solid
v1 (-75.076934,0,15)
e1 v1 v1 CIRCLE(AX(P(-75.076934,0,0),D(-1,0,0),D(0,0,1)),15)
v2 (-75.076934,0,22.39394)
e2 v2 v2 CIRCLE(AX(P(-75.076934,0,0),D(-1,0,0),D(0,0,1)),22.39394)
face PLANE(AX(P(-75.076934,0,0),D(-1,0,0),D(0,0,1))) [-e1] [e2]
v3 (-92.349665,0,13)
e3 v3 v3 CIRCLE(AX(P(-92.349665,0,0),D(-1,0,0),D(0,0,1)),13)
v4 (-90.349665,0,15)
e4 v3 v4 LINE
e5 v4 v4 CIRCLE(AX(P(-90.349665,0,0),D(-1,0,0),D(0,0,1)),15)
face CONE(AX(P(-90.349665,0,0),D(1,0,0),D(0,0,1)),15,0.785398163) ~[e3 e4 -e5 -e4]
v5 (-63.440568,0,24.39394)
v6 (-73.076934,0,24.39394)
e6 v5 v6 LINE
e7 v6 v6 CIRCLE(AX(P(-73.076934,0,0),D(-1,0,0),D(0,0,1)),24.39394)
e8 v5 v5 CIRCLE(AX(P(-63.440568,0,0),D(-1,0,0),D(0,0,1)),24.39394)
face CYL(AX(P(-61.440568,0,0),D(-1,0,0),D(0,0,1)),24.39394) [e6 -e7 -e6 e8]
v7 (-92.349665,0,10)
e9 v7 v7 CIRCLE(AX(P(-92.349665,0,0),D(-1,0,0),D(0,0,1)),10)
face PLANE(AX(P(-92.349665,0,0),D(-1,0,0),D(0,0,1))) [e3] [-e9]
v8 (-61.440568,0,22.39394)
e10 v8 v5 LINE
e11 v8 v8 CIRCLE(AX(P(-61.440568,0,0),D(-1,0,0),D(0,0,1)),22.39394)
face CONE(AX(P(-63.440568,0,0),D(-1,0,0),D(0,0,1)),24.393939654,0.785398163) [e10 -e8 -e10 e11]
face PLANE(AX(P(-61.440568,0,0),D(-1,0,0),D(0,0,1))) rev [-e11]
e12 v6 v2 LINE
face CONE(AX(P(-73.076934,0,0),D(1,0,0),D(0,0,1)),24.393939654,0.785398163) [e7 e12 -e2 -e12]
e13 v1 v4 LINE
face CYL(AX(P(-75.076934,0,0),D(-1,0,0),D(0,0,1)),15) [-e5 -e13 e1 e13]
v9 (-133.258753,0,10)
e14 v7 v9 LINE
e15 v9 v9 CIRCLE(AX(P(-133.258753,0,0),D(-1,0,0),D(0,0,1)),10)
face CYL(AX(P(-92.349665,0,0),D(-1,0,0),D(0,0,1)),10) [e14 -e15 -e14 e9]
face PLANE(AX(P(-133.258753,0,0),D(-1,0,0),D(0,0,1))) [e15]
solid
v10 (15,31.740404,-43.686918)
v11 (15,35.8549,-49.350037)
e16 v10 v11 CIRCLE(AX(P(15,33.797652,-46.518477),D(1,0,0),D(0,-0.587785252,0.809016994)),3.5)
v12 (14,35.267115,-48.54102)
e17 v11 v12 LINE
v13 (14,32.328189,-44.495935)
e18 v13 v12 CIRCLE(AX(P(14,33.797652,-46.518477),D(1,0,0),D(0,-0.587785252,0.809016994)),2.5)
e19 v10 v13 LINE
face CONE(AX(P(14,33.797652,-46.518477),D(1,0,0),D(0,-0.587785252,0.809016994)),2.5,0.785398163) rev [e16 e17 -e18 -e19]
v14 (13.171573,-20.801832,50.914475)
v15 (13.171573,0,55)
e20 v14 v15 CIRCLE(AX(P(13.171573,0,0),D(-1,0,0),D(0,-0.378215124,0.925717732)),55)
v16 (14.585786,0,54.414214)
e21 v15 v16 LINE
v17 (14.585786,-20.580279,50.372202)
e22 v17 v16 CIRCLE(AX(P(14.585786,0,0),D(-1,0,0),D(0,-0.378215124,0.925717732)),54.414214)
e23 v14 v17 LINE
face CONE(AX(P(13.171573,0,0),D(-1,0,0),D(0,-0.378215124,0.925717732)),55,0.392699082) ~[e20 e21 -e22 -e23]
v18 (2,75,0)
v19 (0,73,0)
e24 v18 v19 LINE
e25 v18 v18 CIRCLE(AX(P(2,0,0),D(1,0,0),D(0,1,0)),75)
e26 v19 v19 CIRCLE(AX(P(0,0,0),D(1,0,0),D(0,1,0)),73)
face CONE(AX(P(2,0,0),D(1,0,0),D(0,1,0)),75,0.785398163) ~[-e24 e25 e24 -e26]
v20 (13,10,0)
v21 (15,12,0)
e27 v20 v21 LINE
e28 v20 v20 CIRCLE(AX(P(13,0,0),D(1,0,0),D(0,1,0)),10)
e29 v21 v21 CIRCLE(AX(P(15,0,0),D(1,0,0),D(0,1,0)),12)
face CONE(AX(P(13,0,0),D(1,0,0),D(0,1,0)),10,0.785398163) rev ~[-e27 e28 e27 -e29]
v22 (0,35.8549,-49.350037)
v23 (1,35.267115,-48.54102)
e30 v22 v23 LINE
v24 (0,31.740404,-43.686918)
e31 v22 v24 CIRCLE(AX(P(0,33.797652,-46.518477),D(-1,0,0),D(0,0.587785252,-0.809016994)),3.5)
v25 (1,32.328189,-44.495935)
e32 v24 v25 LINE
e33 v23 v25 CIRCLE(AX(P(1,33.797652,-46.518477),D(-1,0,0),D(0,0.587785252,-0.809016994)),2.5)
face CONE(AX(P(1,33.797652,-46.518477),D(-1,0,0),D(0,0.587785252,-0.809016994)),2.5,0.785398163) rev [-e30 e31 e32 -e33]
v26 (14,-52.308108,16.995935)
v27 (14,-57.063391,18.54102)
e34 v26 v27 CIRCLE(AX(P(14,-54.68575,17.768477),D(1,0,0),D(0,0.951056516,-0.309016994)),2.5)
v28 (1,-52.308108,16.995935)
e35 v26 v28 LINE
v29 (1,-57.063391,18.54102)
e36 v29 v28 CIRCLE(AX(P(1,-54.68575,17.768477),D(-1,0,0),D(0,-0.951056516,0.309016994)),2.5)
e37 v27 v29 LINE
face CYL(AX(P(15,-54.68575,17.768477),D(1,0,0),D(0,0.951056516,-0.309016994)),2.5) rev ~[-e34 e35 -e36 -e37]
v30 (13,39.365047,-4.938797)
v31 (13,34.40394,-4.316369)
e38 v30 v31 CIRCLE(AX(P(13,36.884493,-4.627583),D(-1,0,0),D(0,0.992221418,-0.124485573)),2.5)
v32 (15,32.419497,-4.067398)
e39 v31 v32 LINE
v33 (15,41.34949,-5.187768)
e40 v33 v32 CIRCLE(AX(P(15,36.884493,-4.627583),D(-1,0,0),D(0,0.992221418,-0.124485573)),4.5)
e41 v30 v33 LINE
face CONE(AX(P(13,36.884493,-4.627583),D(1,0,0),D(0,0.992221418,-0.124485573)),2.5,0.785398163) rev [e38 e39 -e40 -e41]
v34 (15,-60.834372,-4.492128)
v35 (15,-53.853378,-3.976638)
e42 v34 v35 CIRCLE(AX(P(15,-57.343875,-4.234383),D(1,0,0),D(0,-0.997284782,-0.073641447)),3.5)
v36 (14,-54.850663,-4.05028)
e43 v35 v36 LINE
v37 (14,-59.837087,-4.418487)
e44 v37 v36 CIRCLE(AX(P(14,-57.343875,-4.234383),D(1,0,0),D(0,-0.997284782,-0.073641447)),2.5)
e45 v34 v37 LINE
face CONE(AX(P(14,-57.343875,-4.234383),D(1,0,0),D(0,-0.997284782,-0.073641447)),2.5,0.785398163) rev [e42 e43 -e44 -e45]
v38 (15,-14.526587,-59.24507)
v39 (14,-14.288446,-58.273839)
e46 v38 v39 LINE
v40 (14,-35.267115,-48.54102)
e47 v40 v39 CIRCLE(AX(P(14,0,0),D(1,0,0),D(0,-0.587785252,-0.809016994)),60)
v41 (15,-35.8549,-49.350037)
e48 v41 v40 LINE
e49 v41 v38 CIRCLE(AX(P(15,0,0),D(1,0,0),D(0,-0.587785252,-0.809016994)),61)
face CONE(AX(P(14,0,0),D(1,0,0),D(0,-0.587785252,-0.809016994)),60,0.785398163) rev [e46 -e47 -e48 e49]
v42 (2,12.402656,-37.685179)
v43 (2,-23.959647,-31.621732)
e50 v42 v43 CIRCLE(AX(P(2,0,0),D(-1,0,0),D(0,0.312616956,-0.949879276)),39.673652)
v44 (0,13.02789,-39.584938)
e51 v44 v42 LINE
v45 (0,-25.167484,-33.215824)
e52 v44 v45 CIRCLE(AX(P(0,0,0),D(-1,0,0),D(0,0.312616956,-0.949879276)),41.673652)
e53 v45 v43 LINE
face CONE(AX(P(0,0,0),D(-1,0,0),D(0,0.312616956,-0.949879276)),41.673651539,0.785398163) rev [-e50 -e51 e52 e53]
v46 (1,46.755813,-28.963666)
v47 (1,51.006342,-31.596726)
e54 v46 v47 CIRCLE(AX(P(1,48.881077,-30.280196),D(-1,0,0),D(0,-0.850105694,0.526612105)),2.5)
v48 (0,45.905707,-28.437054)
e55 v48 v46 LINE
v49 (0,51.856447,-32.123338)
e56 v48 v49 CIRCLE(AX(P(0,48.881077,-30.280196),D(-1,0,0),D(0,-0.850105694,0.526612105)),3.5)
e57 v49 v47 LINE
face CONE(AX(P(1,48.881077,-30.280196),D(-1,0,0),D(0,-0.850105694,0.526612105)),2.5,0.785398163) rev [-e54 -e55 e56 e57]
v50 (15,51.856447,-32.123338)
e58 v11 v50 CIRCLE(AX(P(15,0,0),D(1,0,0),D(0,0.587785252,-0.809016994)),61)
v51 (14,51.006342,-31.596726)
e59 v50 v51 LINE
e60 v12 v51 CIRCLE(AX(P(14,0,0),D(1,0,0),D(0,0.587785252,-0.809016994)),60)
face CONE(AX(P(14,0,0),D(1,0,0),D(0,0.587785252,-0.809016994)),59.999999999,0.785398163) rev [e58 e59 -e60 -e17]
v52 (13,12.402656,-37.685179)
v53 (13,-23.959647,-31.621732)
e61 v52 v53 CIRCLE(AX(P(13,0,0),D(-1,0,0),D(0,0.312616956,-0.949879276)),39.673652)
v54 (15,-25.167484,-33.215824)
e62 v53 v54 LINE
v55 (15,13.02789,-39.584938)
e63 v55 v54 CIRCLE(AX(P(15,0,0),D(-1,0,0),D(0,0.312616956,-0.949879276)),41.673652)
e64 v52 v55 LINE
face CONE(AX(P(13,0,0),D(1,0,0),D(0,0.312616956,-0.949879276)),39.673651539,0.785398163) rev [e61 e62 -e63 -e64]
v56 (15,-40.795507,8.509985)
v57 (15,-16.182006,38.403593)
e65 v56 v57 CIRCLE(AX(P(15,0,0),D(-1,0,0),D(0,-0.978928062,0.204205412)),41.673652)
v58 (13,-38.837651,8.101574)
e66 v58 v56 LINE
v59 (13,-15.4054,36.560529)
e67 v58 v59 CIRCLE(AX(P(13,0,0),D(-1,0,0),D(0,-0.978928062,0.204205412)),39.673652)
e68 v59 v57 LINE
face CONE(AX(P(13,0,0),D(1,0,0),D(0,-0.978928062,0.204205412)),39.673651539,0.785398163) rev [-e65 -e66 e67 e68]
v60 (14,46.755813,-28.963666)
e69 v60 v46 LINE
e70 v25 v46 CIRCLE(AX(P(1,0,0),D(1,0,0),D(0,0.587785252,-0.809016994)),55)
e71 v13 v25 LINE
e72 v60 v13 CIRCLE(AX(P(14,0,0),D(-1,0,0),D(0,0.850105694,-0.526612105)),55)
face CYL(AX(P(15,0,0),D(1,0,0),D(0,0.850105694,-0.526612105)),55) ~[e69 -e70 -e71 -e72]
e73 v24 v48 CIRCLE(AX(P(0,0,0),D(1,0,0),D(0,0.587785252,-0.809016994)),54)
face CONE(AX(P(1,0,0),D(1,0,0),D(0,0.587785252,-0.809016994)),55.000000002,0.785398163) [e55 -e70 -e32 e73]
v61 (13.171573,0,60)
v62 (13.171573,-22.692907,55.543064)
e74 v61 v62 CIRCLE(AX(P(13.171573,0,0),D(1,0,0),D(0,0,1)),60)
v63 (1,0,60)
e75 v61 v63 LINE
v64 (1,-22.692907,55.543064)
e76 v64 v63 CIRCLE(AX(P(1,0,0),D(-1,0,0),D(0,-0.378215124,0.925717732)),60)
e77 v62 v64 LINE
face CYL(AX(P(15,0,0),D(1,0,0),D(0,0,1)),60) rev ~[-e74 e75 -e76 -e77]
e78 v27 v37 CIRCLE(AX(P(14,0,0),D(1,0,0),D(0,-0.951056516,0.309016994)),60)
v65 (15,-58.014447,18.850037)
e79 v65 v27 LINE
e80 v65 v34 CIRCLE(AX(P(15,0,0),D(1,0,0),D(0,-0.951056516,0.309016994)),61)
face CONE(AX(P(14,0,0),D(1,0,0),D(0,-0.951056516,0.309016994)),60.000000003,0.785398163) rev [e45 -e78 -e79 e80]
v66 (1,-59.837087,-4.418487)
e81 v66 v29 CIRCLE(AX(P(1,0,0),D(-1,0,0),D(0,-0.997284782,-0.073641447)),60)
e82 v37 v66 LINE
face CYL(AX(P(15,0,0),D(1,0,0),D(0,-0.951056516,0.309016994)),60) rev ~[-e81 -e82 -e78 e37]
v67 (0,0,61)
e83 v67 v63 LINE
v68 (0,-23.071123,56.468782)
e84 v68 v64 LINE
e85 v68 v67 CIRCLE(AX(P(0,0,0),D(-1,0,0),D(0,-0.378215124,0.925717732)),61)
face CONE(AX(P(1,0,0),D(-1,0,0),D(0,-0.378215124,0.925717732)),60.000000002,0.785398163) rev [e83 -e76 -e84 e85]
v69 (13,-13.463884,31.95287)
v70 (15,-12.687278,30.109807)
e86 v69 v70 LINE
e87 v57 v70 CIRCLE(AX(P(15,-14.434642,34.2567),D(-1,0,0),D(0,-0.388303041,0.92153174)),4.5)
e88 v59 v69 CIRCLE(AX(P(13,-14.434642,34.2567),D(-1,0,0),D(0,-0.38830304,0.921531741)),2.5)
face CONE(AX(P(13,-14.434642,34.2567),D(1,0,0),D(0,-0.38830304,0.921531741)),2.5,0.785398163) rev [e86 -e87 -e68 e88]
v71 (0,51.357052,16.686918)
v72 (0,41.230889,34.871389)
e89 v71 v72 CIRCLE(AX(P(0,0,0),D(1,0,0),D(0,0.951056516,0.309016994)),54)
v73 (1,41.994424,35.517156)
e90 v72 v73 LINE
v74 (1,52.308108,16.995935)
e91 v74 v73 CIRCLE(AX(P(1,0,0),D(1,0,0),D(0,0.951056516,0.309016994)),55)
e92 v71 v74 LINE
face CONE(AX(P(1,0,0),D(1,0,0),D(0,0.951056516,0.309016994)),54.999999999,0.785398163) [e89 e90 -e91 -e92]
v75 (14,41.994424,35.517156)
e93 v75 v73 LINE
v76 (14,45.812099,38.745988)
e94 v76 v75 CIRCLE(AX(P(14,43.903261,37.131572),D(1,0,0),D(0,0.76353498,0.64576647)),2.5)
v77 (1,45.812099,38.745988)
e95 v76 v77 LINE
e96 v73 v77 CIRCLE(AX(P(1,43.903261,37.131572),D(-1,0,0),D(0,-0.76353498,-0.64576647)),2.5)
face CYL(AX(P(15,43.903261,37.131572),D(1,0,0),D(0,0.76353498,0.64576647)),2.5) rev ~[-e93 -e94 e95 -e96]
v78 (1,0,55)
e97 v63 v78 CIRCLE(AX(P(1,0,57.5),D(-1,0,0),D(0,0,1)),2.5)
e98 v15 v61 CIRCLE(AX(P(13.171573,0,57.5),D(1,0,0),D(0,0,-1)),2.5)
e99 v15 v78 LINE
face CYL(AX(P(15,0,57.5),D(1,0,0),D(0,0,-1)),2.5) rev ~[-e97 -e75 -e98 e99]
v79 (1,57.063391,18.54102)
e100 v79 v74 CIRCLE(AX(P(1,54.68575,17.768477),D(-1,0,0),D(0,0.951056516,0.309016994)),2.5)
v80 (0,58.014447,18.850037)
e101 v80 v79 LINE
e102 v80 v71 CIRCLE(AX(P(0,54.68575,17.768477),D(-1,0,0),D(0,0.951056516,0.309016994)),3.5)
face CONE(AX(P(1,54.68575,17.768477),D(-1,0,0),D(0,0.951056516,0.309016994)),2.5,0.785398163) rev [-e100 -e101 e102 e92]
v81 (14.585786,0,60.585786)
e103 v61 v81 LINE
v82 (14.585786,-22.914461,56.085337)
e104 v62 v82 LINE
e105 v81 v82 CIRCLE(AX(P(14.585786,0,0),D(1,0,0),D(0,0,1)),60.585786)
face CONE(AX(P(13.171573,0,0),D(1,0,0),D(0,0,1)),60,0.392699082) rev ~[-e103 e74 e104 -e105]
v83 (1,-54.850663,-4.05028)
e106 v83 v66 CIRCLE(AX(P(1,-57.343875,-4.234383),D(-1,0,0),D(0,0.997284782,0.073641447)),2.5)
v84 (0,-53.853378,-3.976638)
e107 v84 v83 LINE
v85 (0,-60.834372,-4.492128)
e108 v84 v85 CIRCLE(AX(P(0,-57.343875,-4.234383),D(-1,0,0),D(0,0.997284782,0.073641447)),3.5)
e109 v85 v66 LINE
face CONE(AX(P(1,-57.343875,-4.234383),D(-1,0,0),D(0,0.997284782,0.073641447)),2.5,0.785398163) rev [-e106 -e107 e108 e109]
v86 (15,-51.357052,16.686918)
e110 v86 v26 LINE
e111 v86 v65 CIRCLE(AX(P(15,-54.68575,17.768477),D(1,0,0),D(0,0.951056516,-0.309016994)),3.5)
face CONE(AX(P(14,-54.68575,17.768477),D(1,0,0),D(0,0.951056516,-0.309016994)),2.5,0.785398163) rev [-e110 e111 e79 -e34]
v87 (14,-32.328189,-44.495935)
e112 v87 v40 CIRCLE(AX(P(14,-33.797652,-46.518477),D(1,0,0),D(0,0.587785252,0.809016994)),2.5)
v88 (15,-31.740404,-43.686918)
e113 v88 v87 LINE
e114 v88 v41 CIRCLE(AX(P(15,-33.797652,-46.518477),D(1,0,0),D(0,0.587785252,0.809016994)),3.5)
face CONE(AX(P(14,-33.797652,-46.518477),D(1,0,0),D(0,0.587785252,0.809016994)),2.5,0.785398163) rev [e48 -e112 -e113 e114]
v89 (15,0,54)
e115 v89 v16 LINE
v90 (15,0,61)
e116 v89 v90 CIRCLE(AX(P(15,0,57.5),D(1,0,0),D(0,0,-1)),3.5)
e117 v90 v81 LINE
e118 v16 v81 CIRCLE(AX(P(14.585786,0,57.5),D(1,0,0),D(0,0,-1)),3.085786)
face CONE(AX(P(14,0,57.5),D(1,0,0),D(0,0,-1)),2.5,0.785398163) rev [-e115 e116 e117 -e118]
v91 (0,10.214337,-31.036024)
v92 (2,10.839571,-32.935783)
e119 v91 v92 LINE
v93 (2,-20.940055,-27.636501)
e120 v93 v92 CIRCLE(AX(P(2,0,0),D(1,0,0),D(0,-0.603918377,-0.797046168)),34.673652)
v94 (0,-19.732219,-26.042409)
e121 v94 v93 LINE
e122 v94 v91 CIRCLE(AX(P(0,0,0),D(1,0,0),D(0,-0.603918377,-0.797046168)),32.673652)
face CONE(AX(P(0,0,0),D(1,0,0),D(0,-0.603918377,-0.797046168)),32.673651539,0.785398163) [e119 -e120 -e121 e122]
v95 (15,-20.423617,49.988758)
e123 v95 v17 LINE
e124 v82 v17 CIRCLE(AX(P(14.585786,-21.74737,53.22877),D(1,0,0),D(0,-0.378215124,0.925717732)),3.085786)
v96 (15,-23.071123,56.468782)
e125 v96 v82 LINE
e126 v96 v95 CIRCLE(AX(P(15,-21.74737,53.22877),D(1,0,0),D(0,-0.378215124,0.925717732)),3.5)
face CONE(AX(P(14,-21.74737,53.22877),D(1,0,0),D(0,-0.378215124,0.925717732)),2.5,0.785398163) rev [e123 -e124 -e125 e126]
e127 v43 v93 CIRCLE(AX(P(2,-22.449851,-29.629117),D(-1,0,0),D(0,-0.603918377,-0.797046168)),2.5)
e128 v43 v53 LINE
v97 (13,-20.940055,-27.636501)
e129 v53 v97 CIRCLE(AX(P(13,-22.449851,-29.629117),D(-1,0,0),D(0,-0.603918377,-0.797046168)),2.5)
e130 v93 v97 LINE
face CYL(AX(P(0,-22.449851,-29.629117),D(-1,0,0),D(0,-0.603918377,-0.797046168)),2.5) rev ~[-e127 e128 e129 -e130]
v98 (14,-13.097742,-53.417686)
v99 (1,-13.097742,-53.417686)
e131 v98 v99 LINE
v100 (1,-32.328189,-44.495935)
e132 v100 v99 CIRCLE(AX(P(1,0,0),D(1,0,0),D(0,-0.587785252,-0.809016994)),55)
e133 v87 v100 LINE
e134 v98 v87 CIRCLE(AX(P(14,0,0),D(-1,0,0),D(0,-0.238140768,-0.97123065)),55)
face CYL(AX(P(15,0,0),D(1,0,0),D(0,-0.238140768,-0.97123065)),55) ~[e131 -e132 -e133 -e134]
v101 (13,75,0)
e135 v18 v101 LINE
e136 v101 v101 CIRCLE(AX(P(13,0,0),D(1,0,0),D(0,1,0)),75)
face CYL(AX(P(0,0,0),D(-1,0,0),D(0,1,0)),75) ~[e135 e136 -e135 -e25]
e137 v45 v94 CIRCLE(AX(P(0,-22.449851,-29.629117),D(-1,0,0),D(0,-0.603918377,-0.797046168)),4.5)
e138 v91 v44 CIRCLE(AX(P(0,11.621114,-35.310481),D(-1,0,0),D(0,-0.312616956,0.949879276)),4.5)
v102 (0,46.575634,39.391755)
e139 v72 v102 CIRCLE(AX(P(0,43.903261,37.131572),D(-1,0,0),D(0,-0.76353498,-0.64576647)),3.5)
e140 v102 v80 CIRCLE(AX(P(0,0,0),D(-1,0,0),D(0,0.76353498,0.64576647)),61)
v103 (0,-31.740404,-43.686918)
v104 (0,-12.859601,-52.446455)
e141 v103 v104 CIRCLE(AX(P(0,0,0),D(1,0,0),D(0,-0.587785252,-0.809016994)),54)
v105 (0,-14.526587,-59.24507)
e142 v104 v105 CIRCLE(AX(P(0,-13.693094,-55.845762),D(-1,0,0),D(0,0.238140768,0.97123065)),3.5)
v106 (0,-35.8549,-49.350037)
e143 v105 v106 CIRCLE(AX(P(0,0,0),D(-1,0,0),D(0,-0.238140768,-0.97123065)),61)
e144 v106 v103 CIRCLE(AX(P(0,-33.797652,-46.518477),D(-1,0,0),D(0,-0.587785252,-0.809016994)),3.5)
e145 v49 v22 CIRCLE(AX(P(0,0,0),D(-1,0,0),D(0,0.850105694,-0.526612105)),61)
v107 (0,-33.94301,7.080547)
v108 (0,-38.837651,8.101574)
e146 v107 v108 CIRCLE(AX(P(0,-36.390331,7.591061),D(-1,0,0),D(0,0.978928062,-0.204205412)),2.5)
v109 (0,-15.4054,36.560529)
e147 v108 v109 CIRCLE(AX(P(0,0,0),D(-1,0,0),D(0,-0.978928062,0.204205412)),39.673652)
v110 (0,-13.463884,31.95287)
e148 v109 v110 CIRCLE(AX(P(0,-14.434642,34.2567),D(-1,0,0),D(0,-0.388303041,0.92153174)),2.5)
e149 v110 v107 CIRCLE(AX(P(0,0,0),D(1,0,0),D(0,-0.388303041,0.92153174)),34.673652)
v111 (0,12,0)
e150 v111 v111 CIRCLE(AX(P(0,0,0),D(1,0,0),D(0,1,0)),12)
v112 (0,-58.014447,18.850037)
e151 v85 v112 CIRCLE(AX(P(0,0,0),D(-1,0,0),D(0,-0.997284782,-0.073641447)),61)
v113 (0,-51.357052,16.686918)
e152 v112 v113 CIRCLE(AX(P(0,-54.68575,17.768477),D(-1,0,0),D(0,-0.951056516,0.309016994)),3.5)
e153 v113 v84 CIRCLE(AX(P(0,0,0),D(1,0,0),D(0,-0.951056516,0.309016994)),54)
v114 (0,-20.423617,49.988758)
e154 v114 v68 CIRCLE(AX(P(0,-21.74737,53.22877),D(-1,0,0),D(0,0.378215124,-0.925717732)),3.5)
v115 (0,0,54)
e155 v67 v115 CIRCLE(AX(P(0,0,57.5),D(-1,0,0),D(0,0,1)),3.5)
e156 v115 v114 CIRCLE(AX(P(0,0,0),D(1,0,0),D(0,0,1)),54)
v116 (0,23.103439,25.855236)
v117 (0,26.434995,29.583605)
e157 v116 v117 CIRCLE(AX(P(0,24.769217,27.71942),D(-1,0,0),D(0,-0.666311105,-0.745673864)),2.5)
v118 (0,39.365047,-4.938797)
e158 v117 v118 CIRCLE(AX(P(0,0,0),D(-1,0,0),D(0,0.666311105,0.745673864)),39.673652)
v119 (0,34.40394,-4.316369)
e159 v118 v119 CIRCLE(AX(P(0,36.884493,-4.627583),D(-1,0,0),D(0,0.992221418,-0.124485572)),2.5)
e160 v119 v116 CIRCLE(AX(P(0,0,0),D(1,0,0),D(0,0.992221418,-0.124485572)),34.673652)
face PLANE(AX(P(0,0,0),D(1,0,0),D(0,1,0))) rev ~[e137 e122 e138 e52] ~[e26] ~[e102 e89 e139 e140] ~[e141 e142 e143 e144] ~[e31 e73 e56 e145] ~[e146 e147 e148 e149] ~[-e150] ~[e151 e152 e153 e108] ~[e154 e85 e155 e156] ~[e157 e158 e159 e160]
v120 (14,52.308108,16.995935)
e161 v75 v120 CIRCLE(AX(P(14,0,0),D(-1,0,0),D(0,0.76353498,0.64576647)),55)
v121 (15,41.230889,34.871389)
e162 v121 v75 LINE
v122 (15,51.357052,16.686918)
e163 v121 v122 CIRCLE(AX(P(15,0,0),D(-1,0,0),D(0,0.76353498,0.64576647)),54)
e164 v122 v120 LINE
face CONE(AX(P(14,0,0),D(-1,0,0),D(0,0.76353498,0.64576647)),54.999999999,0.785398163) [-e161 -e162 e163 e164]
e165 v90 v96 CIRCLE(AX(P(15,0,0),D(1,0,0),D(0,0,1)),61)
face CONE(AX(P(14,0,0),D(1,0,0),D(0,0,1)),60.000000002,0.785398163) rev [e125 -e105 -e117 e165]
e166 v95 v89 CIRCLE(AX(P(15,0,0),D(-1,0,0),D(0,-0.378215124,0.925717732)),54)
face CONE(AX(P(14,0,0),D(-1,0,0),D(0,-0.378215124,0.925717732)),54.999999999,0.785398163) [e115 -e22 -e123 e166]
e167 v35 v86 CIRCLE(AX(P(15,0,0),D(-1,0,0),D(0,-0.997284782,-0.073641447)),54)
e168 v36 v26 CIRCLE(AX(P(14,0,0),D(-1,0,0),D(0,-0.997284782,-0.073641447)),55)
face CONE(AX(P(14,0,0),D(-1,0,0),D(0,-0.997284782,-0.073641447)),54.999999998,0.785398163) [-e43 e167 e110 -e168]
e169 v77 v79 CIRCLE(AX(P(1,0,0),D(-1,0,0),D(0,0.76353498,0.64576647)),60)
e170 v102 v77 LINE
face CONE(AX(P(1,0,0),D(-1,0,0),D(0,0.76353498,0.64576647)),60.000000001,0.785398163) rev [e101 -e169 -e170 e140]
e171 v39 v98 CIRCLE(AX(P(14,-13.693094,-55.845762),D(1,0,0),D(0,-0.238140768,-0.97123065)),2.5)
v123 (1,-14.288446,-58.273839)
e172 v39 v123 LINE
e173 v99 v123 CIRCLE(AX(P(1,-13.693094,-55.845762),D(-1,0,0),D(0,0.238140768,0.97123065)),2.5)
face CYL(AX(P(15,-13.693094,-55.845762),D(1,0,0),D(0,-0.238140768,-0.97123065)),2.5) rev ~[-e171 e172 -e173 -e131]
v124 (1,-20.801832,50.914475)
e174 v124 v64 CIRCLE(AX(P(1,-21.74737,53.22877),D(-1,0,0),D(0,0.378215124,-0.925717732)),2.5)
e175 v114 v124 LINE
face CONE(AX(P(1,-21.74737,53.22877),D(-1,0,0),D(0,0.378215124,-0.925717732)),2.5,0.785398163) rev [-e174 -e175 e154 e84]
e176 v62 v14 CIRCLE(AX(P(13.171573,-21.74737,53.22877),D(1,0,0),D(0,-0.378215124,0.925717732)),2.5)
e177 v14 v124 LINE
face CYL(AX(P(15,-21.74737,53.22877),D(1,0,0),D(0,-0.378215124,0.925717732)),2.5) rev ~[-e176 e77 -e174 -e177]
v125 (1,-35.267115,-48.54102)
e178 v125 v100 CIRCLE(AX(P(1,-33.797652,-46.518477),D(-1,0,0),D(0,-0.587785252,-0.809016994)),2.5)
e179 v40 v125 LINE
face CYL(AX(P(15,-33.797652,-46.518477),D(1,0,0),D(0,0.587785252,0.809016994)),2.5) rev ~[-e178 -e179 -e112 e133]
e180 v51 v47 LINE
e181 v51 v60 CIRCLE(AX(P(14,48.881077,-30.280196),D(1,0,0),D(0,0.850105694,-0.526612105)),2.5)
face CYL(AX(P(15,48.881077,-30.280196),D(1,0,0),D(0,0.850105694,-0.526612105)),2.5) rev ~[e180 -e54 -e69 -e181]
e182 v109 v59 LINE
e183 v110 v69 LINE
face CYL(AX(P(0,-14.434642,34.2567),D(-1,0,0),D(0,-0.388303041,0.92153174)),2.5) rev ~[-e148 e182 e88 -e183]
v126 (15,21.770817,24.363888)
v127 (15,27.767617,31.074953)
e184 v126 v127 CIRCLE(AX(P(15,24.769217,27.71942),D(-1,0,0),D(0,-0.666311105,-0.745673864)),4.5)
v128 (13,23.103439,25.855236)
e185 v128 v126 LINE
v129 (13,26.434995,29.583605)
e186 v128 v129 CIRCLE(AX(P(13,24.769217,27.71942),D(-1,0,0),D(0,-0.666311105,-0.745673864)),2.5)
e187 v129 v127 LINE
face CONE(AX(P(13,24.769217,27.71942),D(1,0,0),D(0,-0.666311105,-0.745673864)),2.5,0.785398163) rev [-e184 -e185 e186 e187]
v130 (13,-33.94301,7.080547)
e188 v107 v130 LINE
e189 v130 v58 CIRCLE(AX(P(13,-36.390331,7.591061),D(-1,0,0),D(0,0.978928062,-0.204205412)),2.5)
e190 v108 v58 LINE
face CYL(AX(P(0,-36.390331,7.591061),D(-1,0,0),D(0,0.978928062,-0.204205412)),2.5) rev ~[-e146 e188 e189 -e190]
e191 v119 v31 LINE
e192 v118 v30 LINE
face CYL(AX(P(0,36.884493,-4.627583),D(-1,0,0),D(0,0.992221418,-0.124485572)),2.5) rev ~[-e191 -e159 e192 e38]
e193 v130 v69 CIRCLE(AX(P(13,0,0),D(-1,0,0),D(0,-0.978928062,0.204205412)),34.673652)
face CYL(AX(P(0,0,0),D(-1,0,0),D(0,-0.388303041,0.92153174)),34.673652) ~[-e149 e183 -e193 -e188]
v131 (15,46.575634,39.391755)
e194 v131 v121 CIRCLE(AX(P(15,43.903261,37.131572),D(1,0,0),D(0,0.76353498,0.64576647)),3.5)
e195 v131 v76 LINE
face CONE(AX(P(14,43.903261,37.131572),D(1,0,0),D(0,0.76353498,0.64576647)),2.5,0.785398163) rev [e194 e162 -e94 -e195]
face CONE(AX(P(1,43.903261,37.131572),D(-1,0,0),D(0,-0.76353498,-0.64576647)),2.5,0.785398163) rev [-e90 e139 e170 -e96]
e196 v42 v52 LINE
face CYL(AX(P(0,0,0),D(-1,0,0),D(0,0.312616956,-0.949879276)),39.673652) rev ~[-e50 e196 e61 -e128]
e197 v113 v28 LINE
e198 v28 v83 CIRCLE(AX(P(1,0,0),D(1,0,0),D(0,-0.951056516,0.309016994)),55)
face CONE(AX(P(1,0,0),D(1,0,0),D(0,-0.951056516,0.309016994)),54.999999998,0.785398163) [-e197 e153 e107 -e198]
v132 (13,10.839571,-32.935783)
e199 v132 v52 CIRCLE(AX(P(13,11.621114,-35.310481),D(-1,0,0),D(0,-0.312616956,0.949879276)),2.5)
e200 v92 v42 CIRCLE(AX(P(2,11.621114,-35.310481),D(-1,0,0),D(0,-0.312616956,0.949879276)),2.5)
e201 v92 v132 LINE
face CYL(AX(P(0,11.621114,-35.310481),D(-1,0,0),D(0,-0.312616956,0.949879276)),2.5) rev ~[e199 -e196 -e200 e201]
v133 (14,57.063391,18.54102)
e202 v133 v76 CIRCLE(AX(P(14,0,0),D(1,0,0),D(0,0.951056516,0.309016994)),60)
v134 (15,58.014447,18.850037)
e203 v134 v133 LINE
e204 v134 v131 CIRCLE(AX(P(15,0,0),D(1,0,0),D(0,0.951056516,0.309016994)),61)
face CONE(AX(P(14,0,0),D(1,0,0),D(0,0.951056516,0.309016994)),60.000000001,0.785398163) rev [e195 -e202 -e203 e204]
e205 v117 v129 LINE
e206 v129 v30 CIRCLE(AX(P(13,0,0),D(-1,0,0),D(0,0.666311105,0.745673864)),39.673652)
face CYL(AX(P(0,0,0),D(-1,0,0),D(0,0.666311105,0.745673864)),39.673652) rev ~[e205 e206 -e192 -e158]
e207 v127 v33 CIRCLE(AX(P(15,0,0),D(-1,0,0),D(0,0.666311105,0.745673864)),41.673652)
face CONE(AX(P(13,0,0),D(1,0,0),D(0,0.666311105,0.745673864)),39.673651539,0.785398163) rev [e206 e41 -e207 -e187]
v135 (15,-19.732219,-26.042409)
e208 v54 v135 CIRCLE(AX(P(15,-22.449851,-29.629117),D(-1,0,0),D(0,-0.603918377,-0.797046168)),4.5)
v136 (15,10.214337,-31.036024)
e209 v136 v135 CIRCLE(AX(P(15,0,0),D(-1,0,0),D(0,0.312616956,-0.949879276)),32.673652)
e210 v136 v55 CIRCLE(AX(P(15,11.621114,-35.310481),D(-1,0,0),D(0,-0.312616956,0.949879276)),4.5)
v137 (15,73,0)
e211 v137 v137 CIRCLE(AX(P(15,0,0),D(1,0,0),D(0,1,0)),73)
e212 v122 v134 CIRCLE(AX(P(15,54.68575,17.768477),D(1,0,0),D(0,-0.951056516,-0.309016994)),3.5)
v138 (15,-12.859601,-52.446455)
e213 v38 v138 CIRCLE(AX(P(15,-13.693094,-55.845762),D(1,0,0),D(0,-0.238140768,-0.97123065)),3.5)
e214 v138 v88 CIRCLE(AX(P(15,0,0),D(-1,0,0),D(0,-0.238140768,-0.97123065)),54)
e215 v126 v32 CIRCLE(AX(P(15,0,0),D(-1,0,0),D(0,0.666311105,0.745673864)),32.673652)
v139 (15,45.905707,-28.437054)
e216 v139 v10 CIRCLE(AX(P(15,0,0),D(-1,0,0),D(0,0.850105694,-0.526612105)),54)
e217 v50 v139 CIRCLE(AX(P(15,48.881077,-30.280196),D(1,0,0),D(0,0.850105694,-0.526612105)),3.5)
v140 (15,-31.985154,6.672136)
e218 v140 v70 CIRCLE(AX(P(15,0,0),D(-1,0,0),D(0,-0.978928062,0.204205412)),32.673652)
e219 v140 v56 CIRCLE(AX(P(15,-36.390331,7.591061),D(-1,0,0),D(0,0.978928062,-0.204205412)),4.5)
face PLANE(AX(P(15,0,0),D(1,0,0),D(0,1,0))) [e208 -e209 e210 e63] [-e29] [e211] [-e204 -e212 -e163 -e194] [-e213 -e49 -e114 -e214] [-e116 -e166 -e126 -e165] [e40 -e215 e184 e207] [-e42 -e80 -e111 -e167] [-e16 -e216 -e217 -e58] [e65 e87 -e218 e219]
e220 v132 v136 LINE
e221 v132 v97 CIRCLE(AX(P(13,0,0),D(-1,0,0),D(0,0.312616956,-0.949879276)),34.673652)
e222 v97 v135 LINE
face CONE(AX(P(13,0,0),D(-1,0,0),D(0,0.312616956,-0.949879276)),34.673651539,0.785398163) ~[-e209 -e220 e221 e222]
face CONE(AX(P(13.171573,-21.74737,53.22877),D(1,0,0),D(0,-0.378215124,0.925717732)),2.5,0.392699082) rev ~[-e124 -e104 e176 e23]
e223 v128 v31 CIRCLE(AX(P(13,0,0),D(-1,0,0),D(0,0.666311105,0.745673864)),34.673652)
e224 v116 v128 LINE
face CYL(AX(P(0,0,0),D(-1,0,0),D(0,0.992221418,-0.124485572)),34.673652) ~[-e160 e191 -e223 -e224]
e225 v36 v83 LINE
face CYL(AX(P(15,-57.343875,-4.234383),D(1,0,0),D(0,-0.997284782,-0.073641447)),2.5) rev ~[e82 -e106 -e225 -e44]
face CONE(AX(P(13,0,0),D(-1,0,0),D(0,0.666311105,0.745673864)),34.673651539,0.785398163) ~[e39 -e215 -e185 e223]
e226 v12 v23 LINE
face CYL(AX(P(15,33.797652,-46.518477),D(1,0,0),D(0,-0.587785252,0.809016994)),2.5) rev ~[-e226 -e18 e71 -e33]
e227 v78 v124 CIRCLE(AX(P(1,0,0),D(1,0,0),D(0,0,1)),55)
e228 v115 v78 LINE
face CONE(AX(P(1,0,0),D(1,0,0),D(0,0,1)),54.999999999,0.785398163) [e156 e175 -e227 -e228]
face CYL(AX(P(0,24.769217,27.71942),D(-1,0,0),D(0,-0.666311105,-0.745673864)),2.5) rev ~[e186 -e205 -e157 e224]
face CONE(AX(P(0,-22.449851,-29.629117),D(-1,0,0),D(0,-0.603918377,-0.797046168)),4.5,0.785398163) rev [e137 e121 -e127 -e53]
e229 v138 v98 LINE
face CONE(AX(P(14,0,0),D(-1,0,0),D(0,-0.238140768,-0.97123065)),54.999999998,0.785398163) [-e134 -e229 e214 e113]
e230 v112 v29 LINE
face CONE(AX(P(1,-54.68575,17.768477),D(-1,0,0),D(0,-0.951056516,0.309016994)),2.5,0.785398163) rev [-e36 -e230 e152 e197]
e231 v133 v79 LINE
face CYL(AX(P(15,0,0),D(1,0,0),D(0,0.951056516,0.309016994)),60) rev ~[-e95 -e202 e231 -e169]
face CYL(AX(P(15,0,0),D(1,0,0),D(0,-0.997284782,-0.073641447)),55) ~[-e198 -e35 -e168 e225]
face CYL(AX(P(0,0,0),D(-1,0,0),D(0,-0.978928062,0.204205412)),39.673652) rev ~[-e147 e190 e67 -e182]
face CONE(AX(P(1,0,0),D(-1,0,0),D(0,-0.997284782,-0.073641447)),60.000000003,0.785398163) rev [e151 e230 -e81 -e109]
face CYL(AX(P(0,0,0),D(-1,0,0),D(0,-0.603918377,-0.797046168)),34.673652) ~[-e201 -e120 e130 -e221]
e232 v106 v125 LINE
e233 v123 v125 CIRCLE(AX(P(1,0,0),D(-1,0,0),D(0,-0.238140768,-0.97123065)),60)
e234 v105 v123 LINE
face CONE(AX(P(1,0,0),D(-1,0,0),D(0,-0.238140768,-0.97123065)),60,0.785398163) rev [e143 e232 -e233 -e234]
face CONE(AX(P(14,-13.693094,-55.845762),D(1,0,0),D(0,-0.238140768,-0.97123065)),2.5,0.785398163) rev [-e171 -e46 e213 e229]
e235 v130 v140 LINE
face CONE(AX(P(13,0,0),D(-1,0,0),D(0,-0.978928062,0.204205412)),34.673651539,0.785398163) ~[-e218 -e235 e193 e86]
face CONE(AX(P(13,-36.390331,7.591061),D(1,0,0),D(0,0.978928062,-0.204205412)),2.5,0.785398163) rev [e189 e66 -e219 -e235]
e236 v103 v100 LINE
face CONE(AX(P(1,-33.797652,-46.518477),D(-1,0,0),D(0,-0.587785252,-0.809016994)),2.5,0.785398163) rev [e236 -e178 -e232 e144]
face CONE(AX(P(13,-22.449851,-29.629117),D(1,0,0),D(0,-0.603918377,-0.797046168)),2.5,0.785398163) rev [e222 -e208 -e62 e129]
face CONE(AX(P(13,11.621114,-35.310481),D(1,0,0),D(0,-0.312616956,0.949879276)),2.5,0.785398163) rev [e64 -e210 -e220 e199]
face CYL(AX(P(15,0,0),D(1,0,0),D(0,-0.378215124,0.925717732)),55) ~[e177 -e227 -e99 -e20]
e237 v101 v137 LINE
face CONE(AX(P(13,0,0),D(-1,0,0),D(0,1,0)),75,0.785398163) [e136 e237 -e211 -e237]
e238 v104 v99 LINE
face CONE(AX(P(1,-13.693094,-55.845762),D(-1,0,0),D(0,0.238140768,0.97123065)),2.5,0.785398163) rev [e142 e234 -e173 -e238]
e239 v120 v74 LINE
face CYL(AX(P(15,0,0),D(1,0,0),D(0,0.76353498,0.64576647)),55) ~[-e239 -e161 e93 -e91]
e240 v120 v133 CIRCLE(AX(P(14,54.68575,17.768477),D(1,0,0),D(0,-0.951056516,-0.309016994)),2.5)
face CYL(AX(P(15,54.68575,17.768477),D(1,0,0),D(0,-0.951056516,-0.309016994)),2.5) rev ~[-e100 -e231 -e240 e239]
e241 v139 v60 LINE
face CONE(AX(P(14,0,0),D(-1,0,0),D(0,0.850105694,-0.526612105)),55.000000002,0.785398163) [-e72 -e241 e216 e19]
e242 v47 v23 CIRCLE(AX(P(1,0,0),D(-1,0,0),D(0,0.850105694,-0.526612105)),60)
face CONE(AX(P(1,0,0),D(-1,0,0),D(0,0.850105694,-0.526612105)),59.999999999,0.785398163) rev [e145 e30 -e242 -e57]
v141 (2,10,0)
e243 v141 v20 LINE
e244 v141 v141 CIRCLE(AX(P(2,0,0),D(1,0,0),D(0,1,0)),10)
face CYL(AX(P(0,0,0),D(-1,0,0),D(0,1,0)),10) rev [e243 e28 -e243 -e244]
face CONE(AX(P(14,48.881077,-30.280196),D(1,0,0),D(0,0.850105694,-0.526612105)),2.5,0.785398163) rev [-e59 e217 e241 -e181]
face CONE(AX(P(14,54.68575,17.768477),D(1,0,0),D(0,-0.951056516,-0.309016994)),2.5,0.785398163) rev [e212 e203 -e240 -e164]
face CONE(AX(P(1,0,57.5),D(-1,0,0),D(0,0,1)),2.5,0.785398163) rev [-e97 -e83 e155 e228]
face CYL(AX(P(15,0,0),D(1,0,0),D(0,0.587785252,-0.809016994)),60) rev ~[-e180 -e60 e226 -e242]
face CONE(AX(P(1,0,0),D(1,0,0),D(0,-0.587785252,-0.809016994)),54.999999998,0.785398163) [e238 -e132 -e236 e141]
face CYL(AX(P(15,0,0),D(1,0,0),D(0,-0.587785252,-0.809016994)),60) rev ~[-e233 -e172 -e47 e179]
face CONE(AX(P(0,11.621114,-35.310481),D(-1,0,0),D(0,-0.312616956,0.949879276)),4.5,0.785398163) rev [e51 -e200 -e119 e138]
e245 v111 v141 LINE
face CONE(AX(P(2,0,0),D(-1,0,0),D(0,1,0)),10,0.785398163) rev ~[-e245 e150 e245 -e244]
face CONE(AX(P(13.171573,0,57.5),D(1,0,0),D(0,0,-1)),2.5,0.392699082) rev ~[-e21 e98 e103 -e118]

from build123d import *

# Parameters (mm, degrees)
F0_R         = 75
F0_R_2       = 10
F1_DEPTH     = 15
F2_SIZE      = 2
F4_DEPTH     = 15.001
F5_SIZE      = 1
F6_SIZE      = 2
F8_DEPTH     = 15.001
F9_T2_ANGLE  = 55.3680606349
F9_T4_ANGLE  = 22.2231670965
F9_T6_ANGLE  = 55.3680606349
F9_T8_ANGLE  = 55.3680606349
F9_T10_ANGLE = 55.3680606349
F9_T12_ANGLE = 180
F9_T14_ANGLE = 180
F9_T16_ANGLE = 55.3680606349
F9_T18_ANGLE = 180
F9_T20_ANGLE = 180
F9_T22_ANGLE = 55.3680606349
F9_T24_ANGLE = 180
F9_T26_ANGLE = 180
F9_T28_ANGLE = 55.3680606349
F9_T30_ANGLE = 180
F9_T32_ANGLE = 180
F9_T34_ANGLE = 22.2231670965
F9_T36_ANGLE = 180
F9_T38_ANGLE = 180
F9_T40_ANGLE = 55.3680606349
F12_SIZE     = 2


# Not quite as in the source:
# - a fillet or chamfer that OpenCascade refuses, or shapes differently, is made with other operations: its cross-section is extruded or revolved along the edge and cut away or added
# - a feature names something its author has since deleted; it is built from what else it names


with BuildPart() as f1:
    # F0 (on Right) → F1 (new body)
    with BuildSketch(Plane.YZ):
        Circle(F0_R)
        Circle(F0_R_2, mode=Mode.SUBTRACT)
    extrude(amount=F1_DEPTH)

    # F2
    f2_edges = [f1.edges().sort_by_distance(p)[0] for p in [
        (15, -75, 0),
        (0, -75, 0),
        (15, -10, 0),
    ]]
    chamfer(f2_edges, length=F2_SIZE)

    # F3 (on face) → F4 (cut, through all)
    with BuildSketch(Plane.YZ.offset(15)):
        with BuildLine():
            ThreePointArc((0, 55), (2.5, 57.5), (0, 60))
            ThreePointArc((0, 60), (-11.5632210939, 58.8752232941), (-22.6929074633, 55.5430639312))
            ThreePointArc((-22.6929074633, 55.5430639312), (-24.0616639828, 52.2832317897), (-20.8018318414, 50.9144752702))
            ThreePointArc((-20.8018318414, 50.9144752702), (-10.599619336, 53.9689546863), (0, 55))
        make_face()
        with BuildLine():
            ThreePointArc((57.0633909777, 18.5410196625), (52.4204329345, 29.1907213162), (45.8120988288, 38.7459881911))
            ThreePointArc((45.8120988288, 38.7459881911), (42.2888452029, 39.0404094676), (41.9944239264, 35.5171558418))
            ThreePointArc((41.9944239264, 35.5171558418), (48.0520635233, 26.7581612065), (52.3081083962, 16.9959346906))
            ThreePointArc((52.3081083962, 16.9959346906), (55.4582921729, 15.3908358858), (57.0633909777, 18.5410196625))
        make_face()
        with BuildLine():
            ThreePointArc((35.2671151375, -48.5410196625), (43.9608303524, -40.8343653646), (51.0063416355, -31.5967263014))
            ThreePointArc((51.0063416355, -31.5967263014), (50.1976076632, -28.154931804), (46.7558131659, -28.9636657763))
            ThreePointArc((46.7558131659, -28.9636657763), (40.297427823, -37.4315015842), (32.3281888761, -44.4959346906))
            ThreePointArc((32.3281888761, -44.4959346906), (31.7751095209, -47.9879403073), (35.2671151375, -48.5410196625))
        make_face()
        with BuildLine():
            ThreePointArc((-35.2671151375, -48.5410196625), (-25.2511456031, -54.4277470205), (-14.2884460563, -58.2738389785))
            ThreePointArc((-14.2884460563, -58.2738389785), (-11.2650175131, -56.4411142735), (-13.0977422182, -53.4176857303))
            ThreePointArc((-13.0977422182, -53.4176857303), (-23.1468834695, -49.8921014355), (-32.3281888761, -44.4959346906))
            ThreePointArc((-32.3281888761, -44.4959346906), (-35.8201944928, -45.0490140458), (-35.2671151375, -48.5410196625))
        make_face()
        with BuildLine():
            ThreePointArc((-57.0633909777, 18.5410196625), (-59.5668965899, 7.1961677748), (-59.8370869447, -4.4184868423))
            ThreePointArc((-59.8370869447, -4.4184868423), (-57.1597713702, -6.7275951799), (-54.8506630326, -4.0502796055))
            ThreePointArc((-54.8506630326, -4.0502796055), (-54.6029885408, 6.5964871269), (-52.3081083962, 16.9959346906))
            ThreePointArc((-52.3081083962, 16.9959346906), (-53.913207201, 20.1461184673), (-57.0633909777, 18.5410196625))
        make_face()
    extrude(amount=-F4_DEPTH, mode=Mode.SUBTRACT)

    # F5
    f5_edges = [f1.edges().sort_by_distance(p)[0] for p in [
        (15, -10.599619, 53.968955),
        (15, -54.602989, 6.596487),
        (15, 48.052064, 26.758161),
        (15, 40.297428, -37.431502),
        (15, -23.146883, -49.892101),
        (0, -10.599619, 53.968955),
        (0, -54.602989, 6.596487),
        (0, -23.146883, -49.892101),
        (0, 40.297428, -37.431502),
        (0, 48.052064, 26.758161),
        (0, -35.820194, -45.049014),
        (0, -25.251146, -54.427747),
        (0, -11.265018, -56.441114),
        (0, 43.96083, -40.834365),
        (0, 50.197608, -28.154932),
        (0, 31.77511, -47.98794),
        (0, -53.913207, 20.146118),
        (0, -59.566897, 7.196168),
        (0, -57.159771, -6.727595),
        (0, 2.5, 57.5),
        (0, -11.563221, 58.875223),
        (0, -24.061664, 52.283232),
        (0, 55.458292, 15.390836),
        (0, 52.420433, 29.190721),
        (0, 42.288845, 39.040409),
        (15, -35.820194, -45.049014),
        (15, -25.251146, -54.427747),
        (15, -11.265018, -56.441114),
        (15, 43.96083, -40.834365),
        (15, 50.197608, -28.154932),
        (15, 31.77511, -47.98794),
        (15, -53.913207, 20.146118),
        (15, -59.566897, 7.196168),
        (15, -57.159771, -6.727595),
        (15, 55.458292, 15.390836),
        (15, 52.420433, 29.190721),
        (15, 42.288845, 39.040409),
    ]]
    chamfer(f5_edges, length=F5_SIZE)

    # F6
    f6_edges = [f1.edges().sort_by_distance(p)[0] for p in [
        (0, -10, 0),
    ]]
    chamfer(f6_edges, length=F6_SIZE)

    # F7 (on face) → F8 (cut, through all)
    with BuildSketch(Plane(origin=(0, 0, 0), x_dir=(0, -1, 0), z_dir=(-1, 0, 0))):
        with BuildLine():
            ThreePointArc((33.9430104886, 7.0805472984), (36.9008441725, 5.1437406745), (38.8376507964, 8.1015743584))
            ThreePointArc((38.8376507964, 8.1015743584), (30.6276860735, 25.2179196654), (15.4053995333, 36.5605291494))
            ThreePointArc((15.4053995333, 36.5605291494), (12.1308125803, 35.2274574006), (13.4638843291, 31.9528704476))
            ThreePointArc((13.4638843291, 31.9528704476), (26.7677330713, 22.0397499373), (33.9430104886, 7.0805472984))
        make_face()
        with BuildLine():
            ThreePointArc((-10.8395714112, -32.9357830132), (-13.9958119916, -34.5289388117), (-12.4026561931, -37.6851793922))
            ThreePointArc((-12.4026561931, -37.6851793922), (6.5255160241, -39.1333140315), (23.9596472526, -31.621731926))
            ThreePointArc((23.9596472526, -31.621731926), (24.4424667295, -28.1193205634), (20.9400553669, -27.6365010865))
            ThreePointArc((20.9400553669, -27.6365010865), (5.7031168031, -34.2014118101), (-10.8395714112, -32.9357830132))
        make_face()
        with BuildLine():
            ThreePointArc((-23.1034390774, 25.8552357148), (-22.9050321809, 29.3851981372), (-26.4349946032, 29.5836050337))
            ThreePointArc((-26.4349946032, 29.5836050337), (-37.1532020976, 13.915394366), (-39.3650467858, -4.9387972235))
            ThreePointArc((-39.3650467858, -4.9387972235), (-36.5732793098, -7.1081368372), (-34.4039396961, -4.3163693612))
            ThreePointArc((-34.4039396961, -4.3163693612), (-32.4708498744, 12.1616618728), (-23.1034390774, 25.8552357148))
        make_face()
    extrude(amount=-F8_DEPTH, mode=Mode.SUBTRACT)

    # F9: chamfer of 2 on 5 edges, made by hand

    # F9_s1 → F9_t2 (revolve, cut)
    with BuildSketch(Plane(origin=(0, 0, 0), x_dir=(1, 0, 0), z_dir=(0, -0.204205412, -0.9789280616))):
        Polygon((13, 34.6736515393), (15, 32.6736515393), (15, 34.6736515393), align=None)
    revolve(axis=Axis((15, 0, 0), (-1, 0, 0)), revolution_arc=F9_T2_ANGLE, mode=Mode.SUBTRACT)

    # F9_s3 → F9_t4 (revolve, cut)
    with BuildSketch(Plane(origin=(0, 0, 0), x_dir=(1, 0, 0), z_dir=(0, -0.9257177322, -0.3782151244))):
        Polygon((13.1715728753, 55), (14.5857864376, 54.4142135624), (14, 55), align=None)
    revolve(axis=Axis((14, 0, 0), (-1, 0, 0)), revolution_arc=F9_T4_ANGLE, mode=Mode.SUBTRACT)

    # F9_s5 → F9_t6 (revolve, cut)
    with BuildSketch(Plane(origin=(0, 0, 0), x_dir=(1, 0, 0), z_dir=(0, -0.7456738638, 0.6663111052))):
        Polygon((13, 34.6736515393), (15, 32.6736515393), (15, 34.6736515393), align=None)
    revolve(axis=Axis((15, 0, 0), (-1, 0, 0)), revolution_arc=F9_T6_ANGLE, mode=Mode.SUBTRACT)

    # F9_s7 → F9_t8 (revolve, cut)
    with BuildSketch(Plane(origin=(0, 0, 0), x_dir=(1, 0, 0), z_dir=(0, -0.7970461679, 0.6039183771))):
        Polygon((0, -32.6736515393), (2, -34.6736515393), (0, -34.6736515393), align=None)
    revolve(axis=Axis((0, 0, 0), (1, 0, 0)), revolution_arc=F9_T8_ANGLE, mode=Mode.SUBTRACT)

    # F9_s9 → F9_t10 (revolve, cut)
    with BuildSketch(Plane(origin=(0, 0, 0), x_dir=(1, 0, 0), z_dir=(0, 0.9498792758, 0.3126169564))):
        Polygon((13, 34.6736515393), (15, 32.6736515393), (15, 34.6736515393), align=None)
    revolve(axis=Axis((15, 0, 0), (-1, 0, 0)), revolution_arc=F9_T10_ANGLE, mode=Mode.SUBTRACT)

    # F9_s11 → F9_t12 (revolve, cut)
    with BuildSketch(Plane(origin=(0, 0, 0), x_dir=(1, 0, 0), z_dir=(0, -0.9498792758, -0.3126169564))):
        Polygon((13, -34.6736515393), (15, -32.6736515393), (15, -34.6736515393), align=None)
    revolve(axis=Axis((15, 11.6211138021, -35.3104812027), (-1, 0, 0)), revolution_arc=F9_T12_ANGLE, mode=Mode.SUBTRACT)

    # F9_s13 → F9_t14 (revolve, cut)
    with BuildSketch(Plane(origin=(0, 0, 0), x_dir=(1, 0, 0), z_dir=(0, 0.7970461679, -0.6039183771))):
        Polygon((13, 39.6736515393), (15, 41.6736515393), (15, 39.6736515393), align=None)
    revolve(axis=Axis((15, -22.4498513097, -29.6291165062), (-1, 0, 0)), revolution_arc=F9_T14_ANGLE, mode=Mode.SUBTRACT)

    # F9_s15 → F9_t16 (revolve, cut)
    with BuildSketch(Plane(origin=(0, 0, 0), x_dir=(1, 0, 0), z_dir=(0, 0.9498792758, 0.3126169564))):
        Polygon((13, 39.6736515393), (15, 41.6736515393), (15, 39.6736515393), align=None)
    revolve(axis=Axis((15, 0, 0), (-1, 0, 0)), revolution_arc=F9_T16_ANGLE, mode=Mode.SUBTRACT)

    # F9_s17 → F9_t18 (revolve, cut)
    with BuildSketch(Plane(origin=(0, 0, 0), x_dir=(1, 0, 0), z_dir=(0, 0.7970461679, -0.6039183771))):
        Polygon((0, 41.6736515393), (2, 39.6736515393), (0, 39.6736515393), align=None)
    revolve(axis=Axis((0, -22.4498513097, -29.6291165062), (-1, 0, 0)), revolution_arc=F9_T18_ANGLE, mode=Mode.SUBTRACT)

    # F9_s19 → F9_t20 (revolve, cut)
    with BuildSketch(Plane(origin=(0, 0, 0), x_dir=(1, 0, 0), z_dir=(0, -0.9498792758, -0.3126169564))):
        Polygon((0, -32.6736515393), (2, -34.6736515393), (0, -34.6736515393), align=None)
    revolve(axis=Axis((0, 11.6211138021, -35.3104812027), (-1, 0, 0)), revolution_arc=F9_T20_ANGLE, mode=Mode.SUBTRACT)

    # F9_s21 → F9_t22 (revolve, cut)
    with BuildSketch(Plane(origin=(0, 0, 0), x_dir=(1, 0, 0), z_dir=(0, 0.9498792758, 0.3126169564))):
        Polygon((0, 41.6736515393), (2, 39.6736515393), (0, 39.6736515393), align=None)
    revolve(axis=Axis((0, 0, 0), (-1, 0, 0)), revolution_arc=F9_T22_ANGLE, mode=Mode.SUBTRACT)

    # F9_s23 → F9_t24 (revolve, cut)
    with BuildSketch(Plane(origin=(0, 0, 0), x_dir=(1, 0, 0), z_dir=(0, 0.7456738638, -0.6663111052))):
        Polygon((13, -34.6736515393), (15, -32.6736515393), (15, -34.6736515393), align=None)
    revolve(axis=Axis((15, 24.7692168403, 27.7194203743), (-1, 0, 0)), revolution_arc=F9_T24_ANGLE, mode=Mode.SUBTRACT)

    # F9_s25 → F9_t26 (revolve, cut)
    with BuildSketch(Plane(origin=(0, 0, 0), x_dir=(1, 0, 0), z_dir=(0, 0.1244855725, 0.992221418))):
        Polygon((13, 39.6736515393), (15, 41.6736515393), (15, 39.6736515393), align=None)
    revolve(axis=Axis((15, 36.8844932409, -4.6275832923), (-1, 0, 0)), revolution_arc=F9_T26_ANGLE, mode=Mode.SUBTRACT)

    # F9_s27 → F9_t28 (revolve, cut)
    with BuildSketch(Plane(origin=(0, 0, 0), x_dir=(1, 0, 0), z_dir=(0, -0.7456738638, 0.6663111052))):
        Polygon((13, 39.6736515393), (15, 41.6736515393), (15, 39.6736515393), align=None)
    revolve(axis=Axis((15, 0, 0), (-1, 0, 0)), revolution_arc=F9_T28_ANGLE, mode=Mode.SUBTRACT)

    # F9_s29 → F9_t30 (revolve, cut)
    with BuildSketch(Plane(origin=(0, 0, 0), x_dir=(1, 0, 0), z_dir=(0, 0.9257177322, 0.3782151244))):
        Polygon((13.1715728753, -60), (14.5857864376, -60.5857864376), (14, -60), align=None)
    revolve(axis=Axis((14, -21.7473696524, 53.2287696007), (1, 0, 0)), revolution_arc=F9_T30_ANGLE, mode=Mode.SUBTRACT)

    # F9_s31 → F9_t32 (revolve, cut)
    with BuildSketch(Plane.XZ):
        Polygon((13.1715728753, 55), (14.5857864376, 54.4142135624), (14, 55), align=None)
    revolve(axis=Axis((14, 0, 57.5), (1, 0, 0)), revolution_arc=F9_T32_ANGLE, mode=Mode.SUBTRACT)

    # F9_s33 → F9_t34 (revolve, cut)
    with BuildSketch(Plane.XZ):
        Polygon((13.1715728753, 60), (14.5857864376, 60.5857864376), (14, 60), align=None)
    revolve(axis=Axis((14, 0, 0), (1, 0, 0)), revolution_arc=F9_T34_ANGLE, mode=Mode.SUBTRACT)

    # F9_s35 → F9_t36 (revolve, cut)
    with BuildSketch(Plane(origin=(0, 0, 0), x_dir=(1, 0, 0), z_dir=(0, 0.204205412, 0.9789280616))):
        Polygon((13, -34.6736515393), (15, -32.6736515393), (15, -34.6736515393), align=None)
    revolve(axis=Axis((15, -36.3903306425, 7.5910608284), (-1, 0, 0)), revolution_arc=F9_T36_ANGLE, mode=Mode.SUBTRACT)

    # F9_s37 → F9_t38 (revolve, cut)
    with BuildSketch(Plane(origin=(0, 0, 0), x_dir=(1, 0, 0), z_dir=(0, -0.9215317404, -0.3883030408))):
        Polygon((13, 39.6736515393), (15, 41.6736515393), (15, 39.6736515393), align=None)
    revolve(axis=Axis((15, -14.4346419312, 34.2566997985), (-1, 0, 0)), revolution_arc=F9_T38_ANGLE, mode=Mode.SUBTRACT)

    # F9_s39 → F9_t40 (revolve, cut)
    with BuildSketch(Plane(origin=(0, 0, 0), x_dir=(1, 0, 0), z_dir=(0, -0.204205412, -0.9789280616))):
        Polygon((13, 39.6736515393), (15, 41.6736515393), (15, 39.6736515393), align=None)
    revolve(axis=Axis((15, 0, 0), (-1, 0, 0)), revolution_arc=F9_T40_ANGLE, mode=Mode.SUBTRACT)


with BuildPart() as f11:
    # F10 (on Front) → F11 (revolve)
    with BuildSketch(Plane.XZ):
        Polygon((-92.3496652881, 15), (-92.3496652881, 10), (-133.2587525919, 10), (-133.2587525919, 5), (-133.2587525919, 0), (-61.4405683377, 0), (-61.4405683377, 24.3939396538), (-75.0769336305, 24.3939396538), (-75.0769336305, 15), align=None)
    revolve(axis=Axis((-82.1223913184, 0, 0), (-1, 0, 0)))

    # F12
    f12_edges = [f11.edges().sort_by_distance(p)[0] for p in [
        (-92.349665, 0, -15),
        (-75.076934, 0, -24.39394),
        (-61.440568, 0, -24.39394),
    ]]
    chamfer(f12_edges, length=F12_SIZE)


solid = Compound([f1.part, f11.part])
